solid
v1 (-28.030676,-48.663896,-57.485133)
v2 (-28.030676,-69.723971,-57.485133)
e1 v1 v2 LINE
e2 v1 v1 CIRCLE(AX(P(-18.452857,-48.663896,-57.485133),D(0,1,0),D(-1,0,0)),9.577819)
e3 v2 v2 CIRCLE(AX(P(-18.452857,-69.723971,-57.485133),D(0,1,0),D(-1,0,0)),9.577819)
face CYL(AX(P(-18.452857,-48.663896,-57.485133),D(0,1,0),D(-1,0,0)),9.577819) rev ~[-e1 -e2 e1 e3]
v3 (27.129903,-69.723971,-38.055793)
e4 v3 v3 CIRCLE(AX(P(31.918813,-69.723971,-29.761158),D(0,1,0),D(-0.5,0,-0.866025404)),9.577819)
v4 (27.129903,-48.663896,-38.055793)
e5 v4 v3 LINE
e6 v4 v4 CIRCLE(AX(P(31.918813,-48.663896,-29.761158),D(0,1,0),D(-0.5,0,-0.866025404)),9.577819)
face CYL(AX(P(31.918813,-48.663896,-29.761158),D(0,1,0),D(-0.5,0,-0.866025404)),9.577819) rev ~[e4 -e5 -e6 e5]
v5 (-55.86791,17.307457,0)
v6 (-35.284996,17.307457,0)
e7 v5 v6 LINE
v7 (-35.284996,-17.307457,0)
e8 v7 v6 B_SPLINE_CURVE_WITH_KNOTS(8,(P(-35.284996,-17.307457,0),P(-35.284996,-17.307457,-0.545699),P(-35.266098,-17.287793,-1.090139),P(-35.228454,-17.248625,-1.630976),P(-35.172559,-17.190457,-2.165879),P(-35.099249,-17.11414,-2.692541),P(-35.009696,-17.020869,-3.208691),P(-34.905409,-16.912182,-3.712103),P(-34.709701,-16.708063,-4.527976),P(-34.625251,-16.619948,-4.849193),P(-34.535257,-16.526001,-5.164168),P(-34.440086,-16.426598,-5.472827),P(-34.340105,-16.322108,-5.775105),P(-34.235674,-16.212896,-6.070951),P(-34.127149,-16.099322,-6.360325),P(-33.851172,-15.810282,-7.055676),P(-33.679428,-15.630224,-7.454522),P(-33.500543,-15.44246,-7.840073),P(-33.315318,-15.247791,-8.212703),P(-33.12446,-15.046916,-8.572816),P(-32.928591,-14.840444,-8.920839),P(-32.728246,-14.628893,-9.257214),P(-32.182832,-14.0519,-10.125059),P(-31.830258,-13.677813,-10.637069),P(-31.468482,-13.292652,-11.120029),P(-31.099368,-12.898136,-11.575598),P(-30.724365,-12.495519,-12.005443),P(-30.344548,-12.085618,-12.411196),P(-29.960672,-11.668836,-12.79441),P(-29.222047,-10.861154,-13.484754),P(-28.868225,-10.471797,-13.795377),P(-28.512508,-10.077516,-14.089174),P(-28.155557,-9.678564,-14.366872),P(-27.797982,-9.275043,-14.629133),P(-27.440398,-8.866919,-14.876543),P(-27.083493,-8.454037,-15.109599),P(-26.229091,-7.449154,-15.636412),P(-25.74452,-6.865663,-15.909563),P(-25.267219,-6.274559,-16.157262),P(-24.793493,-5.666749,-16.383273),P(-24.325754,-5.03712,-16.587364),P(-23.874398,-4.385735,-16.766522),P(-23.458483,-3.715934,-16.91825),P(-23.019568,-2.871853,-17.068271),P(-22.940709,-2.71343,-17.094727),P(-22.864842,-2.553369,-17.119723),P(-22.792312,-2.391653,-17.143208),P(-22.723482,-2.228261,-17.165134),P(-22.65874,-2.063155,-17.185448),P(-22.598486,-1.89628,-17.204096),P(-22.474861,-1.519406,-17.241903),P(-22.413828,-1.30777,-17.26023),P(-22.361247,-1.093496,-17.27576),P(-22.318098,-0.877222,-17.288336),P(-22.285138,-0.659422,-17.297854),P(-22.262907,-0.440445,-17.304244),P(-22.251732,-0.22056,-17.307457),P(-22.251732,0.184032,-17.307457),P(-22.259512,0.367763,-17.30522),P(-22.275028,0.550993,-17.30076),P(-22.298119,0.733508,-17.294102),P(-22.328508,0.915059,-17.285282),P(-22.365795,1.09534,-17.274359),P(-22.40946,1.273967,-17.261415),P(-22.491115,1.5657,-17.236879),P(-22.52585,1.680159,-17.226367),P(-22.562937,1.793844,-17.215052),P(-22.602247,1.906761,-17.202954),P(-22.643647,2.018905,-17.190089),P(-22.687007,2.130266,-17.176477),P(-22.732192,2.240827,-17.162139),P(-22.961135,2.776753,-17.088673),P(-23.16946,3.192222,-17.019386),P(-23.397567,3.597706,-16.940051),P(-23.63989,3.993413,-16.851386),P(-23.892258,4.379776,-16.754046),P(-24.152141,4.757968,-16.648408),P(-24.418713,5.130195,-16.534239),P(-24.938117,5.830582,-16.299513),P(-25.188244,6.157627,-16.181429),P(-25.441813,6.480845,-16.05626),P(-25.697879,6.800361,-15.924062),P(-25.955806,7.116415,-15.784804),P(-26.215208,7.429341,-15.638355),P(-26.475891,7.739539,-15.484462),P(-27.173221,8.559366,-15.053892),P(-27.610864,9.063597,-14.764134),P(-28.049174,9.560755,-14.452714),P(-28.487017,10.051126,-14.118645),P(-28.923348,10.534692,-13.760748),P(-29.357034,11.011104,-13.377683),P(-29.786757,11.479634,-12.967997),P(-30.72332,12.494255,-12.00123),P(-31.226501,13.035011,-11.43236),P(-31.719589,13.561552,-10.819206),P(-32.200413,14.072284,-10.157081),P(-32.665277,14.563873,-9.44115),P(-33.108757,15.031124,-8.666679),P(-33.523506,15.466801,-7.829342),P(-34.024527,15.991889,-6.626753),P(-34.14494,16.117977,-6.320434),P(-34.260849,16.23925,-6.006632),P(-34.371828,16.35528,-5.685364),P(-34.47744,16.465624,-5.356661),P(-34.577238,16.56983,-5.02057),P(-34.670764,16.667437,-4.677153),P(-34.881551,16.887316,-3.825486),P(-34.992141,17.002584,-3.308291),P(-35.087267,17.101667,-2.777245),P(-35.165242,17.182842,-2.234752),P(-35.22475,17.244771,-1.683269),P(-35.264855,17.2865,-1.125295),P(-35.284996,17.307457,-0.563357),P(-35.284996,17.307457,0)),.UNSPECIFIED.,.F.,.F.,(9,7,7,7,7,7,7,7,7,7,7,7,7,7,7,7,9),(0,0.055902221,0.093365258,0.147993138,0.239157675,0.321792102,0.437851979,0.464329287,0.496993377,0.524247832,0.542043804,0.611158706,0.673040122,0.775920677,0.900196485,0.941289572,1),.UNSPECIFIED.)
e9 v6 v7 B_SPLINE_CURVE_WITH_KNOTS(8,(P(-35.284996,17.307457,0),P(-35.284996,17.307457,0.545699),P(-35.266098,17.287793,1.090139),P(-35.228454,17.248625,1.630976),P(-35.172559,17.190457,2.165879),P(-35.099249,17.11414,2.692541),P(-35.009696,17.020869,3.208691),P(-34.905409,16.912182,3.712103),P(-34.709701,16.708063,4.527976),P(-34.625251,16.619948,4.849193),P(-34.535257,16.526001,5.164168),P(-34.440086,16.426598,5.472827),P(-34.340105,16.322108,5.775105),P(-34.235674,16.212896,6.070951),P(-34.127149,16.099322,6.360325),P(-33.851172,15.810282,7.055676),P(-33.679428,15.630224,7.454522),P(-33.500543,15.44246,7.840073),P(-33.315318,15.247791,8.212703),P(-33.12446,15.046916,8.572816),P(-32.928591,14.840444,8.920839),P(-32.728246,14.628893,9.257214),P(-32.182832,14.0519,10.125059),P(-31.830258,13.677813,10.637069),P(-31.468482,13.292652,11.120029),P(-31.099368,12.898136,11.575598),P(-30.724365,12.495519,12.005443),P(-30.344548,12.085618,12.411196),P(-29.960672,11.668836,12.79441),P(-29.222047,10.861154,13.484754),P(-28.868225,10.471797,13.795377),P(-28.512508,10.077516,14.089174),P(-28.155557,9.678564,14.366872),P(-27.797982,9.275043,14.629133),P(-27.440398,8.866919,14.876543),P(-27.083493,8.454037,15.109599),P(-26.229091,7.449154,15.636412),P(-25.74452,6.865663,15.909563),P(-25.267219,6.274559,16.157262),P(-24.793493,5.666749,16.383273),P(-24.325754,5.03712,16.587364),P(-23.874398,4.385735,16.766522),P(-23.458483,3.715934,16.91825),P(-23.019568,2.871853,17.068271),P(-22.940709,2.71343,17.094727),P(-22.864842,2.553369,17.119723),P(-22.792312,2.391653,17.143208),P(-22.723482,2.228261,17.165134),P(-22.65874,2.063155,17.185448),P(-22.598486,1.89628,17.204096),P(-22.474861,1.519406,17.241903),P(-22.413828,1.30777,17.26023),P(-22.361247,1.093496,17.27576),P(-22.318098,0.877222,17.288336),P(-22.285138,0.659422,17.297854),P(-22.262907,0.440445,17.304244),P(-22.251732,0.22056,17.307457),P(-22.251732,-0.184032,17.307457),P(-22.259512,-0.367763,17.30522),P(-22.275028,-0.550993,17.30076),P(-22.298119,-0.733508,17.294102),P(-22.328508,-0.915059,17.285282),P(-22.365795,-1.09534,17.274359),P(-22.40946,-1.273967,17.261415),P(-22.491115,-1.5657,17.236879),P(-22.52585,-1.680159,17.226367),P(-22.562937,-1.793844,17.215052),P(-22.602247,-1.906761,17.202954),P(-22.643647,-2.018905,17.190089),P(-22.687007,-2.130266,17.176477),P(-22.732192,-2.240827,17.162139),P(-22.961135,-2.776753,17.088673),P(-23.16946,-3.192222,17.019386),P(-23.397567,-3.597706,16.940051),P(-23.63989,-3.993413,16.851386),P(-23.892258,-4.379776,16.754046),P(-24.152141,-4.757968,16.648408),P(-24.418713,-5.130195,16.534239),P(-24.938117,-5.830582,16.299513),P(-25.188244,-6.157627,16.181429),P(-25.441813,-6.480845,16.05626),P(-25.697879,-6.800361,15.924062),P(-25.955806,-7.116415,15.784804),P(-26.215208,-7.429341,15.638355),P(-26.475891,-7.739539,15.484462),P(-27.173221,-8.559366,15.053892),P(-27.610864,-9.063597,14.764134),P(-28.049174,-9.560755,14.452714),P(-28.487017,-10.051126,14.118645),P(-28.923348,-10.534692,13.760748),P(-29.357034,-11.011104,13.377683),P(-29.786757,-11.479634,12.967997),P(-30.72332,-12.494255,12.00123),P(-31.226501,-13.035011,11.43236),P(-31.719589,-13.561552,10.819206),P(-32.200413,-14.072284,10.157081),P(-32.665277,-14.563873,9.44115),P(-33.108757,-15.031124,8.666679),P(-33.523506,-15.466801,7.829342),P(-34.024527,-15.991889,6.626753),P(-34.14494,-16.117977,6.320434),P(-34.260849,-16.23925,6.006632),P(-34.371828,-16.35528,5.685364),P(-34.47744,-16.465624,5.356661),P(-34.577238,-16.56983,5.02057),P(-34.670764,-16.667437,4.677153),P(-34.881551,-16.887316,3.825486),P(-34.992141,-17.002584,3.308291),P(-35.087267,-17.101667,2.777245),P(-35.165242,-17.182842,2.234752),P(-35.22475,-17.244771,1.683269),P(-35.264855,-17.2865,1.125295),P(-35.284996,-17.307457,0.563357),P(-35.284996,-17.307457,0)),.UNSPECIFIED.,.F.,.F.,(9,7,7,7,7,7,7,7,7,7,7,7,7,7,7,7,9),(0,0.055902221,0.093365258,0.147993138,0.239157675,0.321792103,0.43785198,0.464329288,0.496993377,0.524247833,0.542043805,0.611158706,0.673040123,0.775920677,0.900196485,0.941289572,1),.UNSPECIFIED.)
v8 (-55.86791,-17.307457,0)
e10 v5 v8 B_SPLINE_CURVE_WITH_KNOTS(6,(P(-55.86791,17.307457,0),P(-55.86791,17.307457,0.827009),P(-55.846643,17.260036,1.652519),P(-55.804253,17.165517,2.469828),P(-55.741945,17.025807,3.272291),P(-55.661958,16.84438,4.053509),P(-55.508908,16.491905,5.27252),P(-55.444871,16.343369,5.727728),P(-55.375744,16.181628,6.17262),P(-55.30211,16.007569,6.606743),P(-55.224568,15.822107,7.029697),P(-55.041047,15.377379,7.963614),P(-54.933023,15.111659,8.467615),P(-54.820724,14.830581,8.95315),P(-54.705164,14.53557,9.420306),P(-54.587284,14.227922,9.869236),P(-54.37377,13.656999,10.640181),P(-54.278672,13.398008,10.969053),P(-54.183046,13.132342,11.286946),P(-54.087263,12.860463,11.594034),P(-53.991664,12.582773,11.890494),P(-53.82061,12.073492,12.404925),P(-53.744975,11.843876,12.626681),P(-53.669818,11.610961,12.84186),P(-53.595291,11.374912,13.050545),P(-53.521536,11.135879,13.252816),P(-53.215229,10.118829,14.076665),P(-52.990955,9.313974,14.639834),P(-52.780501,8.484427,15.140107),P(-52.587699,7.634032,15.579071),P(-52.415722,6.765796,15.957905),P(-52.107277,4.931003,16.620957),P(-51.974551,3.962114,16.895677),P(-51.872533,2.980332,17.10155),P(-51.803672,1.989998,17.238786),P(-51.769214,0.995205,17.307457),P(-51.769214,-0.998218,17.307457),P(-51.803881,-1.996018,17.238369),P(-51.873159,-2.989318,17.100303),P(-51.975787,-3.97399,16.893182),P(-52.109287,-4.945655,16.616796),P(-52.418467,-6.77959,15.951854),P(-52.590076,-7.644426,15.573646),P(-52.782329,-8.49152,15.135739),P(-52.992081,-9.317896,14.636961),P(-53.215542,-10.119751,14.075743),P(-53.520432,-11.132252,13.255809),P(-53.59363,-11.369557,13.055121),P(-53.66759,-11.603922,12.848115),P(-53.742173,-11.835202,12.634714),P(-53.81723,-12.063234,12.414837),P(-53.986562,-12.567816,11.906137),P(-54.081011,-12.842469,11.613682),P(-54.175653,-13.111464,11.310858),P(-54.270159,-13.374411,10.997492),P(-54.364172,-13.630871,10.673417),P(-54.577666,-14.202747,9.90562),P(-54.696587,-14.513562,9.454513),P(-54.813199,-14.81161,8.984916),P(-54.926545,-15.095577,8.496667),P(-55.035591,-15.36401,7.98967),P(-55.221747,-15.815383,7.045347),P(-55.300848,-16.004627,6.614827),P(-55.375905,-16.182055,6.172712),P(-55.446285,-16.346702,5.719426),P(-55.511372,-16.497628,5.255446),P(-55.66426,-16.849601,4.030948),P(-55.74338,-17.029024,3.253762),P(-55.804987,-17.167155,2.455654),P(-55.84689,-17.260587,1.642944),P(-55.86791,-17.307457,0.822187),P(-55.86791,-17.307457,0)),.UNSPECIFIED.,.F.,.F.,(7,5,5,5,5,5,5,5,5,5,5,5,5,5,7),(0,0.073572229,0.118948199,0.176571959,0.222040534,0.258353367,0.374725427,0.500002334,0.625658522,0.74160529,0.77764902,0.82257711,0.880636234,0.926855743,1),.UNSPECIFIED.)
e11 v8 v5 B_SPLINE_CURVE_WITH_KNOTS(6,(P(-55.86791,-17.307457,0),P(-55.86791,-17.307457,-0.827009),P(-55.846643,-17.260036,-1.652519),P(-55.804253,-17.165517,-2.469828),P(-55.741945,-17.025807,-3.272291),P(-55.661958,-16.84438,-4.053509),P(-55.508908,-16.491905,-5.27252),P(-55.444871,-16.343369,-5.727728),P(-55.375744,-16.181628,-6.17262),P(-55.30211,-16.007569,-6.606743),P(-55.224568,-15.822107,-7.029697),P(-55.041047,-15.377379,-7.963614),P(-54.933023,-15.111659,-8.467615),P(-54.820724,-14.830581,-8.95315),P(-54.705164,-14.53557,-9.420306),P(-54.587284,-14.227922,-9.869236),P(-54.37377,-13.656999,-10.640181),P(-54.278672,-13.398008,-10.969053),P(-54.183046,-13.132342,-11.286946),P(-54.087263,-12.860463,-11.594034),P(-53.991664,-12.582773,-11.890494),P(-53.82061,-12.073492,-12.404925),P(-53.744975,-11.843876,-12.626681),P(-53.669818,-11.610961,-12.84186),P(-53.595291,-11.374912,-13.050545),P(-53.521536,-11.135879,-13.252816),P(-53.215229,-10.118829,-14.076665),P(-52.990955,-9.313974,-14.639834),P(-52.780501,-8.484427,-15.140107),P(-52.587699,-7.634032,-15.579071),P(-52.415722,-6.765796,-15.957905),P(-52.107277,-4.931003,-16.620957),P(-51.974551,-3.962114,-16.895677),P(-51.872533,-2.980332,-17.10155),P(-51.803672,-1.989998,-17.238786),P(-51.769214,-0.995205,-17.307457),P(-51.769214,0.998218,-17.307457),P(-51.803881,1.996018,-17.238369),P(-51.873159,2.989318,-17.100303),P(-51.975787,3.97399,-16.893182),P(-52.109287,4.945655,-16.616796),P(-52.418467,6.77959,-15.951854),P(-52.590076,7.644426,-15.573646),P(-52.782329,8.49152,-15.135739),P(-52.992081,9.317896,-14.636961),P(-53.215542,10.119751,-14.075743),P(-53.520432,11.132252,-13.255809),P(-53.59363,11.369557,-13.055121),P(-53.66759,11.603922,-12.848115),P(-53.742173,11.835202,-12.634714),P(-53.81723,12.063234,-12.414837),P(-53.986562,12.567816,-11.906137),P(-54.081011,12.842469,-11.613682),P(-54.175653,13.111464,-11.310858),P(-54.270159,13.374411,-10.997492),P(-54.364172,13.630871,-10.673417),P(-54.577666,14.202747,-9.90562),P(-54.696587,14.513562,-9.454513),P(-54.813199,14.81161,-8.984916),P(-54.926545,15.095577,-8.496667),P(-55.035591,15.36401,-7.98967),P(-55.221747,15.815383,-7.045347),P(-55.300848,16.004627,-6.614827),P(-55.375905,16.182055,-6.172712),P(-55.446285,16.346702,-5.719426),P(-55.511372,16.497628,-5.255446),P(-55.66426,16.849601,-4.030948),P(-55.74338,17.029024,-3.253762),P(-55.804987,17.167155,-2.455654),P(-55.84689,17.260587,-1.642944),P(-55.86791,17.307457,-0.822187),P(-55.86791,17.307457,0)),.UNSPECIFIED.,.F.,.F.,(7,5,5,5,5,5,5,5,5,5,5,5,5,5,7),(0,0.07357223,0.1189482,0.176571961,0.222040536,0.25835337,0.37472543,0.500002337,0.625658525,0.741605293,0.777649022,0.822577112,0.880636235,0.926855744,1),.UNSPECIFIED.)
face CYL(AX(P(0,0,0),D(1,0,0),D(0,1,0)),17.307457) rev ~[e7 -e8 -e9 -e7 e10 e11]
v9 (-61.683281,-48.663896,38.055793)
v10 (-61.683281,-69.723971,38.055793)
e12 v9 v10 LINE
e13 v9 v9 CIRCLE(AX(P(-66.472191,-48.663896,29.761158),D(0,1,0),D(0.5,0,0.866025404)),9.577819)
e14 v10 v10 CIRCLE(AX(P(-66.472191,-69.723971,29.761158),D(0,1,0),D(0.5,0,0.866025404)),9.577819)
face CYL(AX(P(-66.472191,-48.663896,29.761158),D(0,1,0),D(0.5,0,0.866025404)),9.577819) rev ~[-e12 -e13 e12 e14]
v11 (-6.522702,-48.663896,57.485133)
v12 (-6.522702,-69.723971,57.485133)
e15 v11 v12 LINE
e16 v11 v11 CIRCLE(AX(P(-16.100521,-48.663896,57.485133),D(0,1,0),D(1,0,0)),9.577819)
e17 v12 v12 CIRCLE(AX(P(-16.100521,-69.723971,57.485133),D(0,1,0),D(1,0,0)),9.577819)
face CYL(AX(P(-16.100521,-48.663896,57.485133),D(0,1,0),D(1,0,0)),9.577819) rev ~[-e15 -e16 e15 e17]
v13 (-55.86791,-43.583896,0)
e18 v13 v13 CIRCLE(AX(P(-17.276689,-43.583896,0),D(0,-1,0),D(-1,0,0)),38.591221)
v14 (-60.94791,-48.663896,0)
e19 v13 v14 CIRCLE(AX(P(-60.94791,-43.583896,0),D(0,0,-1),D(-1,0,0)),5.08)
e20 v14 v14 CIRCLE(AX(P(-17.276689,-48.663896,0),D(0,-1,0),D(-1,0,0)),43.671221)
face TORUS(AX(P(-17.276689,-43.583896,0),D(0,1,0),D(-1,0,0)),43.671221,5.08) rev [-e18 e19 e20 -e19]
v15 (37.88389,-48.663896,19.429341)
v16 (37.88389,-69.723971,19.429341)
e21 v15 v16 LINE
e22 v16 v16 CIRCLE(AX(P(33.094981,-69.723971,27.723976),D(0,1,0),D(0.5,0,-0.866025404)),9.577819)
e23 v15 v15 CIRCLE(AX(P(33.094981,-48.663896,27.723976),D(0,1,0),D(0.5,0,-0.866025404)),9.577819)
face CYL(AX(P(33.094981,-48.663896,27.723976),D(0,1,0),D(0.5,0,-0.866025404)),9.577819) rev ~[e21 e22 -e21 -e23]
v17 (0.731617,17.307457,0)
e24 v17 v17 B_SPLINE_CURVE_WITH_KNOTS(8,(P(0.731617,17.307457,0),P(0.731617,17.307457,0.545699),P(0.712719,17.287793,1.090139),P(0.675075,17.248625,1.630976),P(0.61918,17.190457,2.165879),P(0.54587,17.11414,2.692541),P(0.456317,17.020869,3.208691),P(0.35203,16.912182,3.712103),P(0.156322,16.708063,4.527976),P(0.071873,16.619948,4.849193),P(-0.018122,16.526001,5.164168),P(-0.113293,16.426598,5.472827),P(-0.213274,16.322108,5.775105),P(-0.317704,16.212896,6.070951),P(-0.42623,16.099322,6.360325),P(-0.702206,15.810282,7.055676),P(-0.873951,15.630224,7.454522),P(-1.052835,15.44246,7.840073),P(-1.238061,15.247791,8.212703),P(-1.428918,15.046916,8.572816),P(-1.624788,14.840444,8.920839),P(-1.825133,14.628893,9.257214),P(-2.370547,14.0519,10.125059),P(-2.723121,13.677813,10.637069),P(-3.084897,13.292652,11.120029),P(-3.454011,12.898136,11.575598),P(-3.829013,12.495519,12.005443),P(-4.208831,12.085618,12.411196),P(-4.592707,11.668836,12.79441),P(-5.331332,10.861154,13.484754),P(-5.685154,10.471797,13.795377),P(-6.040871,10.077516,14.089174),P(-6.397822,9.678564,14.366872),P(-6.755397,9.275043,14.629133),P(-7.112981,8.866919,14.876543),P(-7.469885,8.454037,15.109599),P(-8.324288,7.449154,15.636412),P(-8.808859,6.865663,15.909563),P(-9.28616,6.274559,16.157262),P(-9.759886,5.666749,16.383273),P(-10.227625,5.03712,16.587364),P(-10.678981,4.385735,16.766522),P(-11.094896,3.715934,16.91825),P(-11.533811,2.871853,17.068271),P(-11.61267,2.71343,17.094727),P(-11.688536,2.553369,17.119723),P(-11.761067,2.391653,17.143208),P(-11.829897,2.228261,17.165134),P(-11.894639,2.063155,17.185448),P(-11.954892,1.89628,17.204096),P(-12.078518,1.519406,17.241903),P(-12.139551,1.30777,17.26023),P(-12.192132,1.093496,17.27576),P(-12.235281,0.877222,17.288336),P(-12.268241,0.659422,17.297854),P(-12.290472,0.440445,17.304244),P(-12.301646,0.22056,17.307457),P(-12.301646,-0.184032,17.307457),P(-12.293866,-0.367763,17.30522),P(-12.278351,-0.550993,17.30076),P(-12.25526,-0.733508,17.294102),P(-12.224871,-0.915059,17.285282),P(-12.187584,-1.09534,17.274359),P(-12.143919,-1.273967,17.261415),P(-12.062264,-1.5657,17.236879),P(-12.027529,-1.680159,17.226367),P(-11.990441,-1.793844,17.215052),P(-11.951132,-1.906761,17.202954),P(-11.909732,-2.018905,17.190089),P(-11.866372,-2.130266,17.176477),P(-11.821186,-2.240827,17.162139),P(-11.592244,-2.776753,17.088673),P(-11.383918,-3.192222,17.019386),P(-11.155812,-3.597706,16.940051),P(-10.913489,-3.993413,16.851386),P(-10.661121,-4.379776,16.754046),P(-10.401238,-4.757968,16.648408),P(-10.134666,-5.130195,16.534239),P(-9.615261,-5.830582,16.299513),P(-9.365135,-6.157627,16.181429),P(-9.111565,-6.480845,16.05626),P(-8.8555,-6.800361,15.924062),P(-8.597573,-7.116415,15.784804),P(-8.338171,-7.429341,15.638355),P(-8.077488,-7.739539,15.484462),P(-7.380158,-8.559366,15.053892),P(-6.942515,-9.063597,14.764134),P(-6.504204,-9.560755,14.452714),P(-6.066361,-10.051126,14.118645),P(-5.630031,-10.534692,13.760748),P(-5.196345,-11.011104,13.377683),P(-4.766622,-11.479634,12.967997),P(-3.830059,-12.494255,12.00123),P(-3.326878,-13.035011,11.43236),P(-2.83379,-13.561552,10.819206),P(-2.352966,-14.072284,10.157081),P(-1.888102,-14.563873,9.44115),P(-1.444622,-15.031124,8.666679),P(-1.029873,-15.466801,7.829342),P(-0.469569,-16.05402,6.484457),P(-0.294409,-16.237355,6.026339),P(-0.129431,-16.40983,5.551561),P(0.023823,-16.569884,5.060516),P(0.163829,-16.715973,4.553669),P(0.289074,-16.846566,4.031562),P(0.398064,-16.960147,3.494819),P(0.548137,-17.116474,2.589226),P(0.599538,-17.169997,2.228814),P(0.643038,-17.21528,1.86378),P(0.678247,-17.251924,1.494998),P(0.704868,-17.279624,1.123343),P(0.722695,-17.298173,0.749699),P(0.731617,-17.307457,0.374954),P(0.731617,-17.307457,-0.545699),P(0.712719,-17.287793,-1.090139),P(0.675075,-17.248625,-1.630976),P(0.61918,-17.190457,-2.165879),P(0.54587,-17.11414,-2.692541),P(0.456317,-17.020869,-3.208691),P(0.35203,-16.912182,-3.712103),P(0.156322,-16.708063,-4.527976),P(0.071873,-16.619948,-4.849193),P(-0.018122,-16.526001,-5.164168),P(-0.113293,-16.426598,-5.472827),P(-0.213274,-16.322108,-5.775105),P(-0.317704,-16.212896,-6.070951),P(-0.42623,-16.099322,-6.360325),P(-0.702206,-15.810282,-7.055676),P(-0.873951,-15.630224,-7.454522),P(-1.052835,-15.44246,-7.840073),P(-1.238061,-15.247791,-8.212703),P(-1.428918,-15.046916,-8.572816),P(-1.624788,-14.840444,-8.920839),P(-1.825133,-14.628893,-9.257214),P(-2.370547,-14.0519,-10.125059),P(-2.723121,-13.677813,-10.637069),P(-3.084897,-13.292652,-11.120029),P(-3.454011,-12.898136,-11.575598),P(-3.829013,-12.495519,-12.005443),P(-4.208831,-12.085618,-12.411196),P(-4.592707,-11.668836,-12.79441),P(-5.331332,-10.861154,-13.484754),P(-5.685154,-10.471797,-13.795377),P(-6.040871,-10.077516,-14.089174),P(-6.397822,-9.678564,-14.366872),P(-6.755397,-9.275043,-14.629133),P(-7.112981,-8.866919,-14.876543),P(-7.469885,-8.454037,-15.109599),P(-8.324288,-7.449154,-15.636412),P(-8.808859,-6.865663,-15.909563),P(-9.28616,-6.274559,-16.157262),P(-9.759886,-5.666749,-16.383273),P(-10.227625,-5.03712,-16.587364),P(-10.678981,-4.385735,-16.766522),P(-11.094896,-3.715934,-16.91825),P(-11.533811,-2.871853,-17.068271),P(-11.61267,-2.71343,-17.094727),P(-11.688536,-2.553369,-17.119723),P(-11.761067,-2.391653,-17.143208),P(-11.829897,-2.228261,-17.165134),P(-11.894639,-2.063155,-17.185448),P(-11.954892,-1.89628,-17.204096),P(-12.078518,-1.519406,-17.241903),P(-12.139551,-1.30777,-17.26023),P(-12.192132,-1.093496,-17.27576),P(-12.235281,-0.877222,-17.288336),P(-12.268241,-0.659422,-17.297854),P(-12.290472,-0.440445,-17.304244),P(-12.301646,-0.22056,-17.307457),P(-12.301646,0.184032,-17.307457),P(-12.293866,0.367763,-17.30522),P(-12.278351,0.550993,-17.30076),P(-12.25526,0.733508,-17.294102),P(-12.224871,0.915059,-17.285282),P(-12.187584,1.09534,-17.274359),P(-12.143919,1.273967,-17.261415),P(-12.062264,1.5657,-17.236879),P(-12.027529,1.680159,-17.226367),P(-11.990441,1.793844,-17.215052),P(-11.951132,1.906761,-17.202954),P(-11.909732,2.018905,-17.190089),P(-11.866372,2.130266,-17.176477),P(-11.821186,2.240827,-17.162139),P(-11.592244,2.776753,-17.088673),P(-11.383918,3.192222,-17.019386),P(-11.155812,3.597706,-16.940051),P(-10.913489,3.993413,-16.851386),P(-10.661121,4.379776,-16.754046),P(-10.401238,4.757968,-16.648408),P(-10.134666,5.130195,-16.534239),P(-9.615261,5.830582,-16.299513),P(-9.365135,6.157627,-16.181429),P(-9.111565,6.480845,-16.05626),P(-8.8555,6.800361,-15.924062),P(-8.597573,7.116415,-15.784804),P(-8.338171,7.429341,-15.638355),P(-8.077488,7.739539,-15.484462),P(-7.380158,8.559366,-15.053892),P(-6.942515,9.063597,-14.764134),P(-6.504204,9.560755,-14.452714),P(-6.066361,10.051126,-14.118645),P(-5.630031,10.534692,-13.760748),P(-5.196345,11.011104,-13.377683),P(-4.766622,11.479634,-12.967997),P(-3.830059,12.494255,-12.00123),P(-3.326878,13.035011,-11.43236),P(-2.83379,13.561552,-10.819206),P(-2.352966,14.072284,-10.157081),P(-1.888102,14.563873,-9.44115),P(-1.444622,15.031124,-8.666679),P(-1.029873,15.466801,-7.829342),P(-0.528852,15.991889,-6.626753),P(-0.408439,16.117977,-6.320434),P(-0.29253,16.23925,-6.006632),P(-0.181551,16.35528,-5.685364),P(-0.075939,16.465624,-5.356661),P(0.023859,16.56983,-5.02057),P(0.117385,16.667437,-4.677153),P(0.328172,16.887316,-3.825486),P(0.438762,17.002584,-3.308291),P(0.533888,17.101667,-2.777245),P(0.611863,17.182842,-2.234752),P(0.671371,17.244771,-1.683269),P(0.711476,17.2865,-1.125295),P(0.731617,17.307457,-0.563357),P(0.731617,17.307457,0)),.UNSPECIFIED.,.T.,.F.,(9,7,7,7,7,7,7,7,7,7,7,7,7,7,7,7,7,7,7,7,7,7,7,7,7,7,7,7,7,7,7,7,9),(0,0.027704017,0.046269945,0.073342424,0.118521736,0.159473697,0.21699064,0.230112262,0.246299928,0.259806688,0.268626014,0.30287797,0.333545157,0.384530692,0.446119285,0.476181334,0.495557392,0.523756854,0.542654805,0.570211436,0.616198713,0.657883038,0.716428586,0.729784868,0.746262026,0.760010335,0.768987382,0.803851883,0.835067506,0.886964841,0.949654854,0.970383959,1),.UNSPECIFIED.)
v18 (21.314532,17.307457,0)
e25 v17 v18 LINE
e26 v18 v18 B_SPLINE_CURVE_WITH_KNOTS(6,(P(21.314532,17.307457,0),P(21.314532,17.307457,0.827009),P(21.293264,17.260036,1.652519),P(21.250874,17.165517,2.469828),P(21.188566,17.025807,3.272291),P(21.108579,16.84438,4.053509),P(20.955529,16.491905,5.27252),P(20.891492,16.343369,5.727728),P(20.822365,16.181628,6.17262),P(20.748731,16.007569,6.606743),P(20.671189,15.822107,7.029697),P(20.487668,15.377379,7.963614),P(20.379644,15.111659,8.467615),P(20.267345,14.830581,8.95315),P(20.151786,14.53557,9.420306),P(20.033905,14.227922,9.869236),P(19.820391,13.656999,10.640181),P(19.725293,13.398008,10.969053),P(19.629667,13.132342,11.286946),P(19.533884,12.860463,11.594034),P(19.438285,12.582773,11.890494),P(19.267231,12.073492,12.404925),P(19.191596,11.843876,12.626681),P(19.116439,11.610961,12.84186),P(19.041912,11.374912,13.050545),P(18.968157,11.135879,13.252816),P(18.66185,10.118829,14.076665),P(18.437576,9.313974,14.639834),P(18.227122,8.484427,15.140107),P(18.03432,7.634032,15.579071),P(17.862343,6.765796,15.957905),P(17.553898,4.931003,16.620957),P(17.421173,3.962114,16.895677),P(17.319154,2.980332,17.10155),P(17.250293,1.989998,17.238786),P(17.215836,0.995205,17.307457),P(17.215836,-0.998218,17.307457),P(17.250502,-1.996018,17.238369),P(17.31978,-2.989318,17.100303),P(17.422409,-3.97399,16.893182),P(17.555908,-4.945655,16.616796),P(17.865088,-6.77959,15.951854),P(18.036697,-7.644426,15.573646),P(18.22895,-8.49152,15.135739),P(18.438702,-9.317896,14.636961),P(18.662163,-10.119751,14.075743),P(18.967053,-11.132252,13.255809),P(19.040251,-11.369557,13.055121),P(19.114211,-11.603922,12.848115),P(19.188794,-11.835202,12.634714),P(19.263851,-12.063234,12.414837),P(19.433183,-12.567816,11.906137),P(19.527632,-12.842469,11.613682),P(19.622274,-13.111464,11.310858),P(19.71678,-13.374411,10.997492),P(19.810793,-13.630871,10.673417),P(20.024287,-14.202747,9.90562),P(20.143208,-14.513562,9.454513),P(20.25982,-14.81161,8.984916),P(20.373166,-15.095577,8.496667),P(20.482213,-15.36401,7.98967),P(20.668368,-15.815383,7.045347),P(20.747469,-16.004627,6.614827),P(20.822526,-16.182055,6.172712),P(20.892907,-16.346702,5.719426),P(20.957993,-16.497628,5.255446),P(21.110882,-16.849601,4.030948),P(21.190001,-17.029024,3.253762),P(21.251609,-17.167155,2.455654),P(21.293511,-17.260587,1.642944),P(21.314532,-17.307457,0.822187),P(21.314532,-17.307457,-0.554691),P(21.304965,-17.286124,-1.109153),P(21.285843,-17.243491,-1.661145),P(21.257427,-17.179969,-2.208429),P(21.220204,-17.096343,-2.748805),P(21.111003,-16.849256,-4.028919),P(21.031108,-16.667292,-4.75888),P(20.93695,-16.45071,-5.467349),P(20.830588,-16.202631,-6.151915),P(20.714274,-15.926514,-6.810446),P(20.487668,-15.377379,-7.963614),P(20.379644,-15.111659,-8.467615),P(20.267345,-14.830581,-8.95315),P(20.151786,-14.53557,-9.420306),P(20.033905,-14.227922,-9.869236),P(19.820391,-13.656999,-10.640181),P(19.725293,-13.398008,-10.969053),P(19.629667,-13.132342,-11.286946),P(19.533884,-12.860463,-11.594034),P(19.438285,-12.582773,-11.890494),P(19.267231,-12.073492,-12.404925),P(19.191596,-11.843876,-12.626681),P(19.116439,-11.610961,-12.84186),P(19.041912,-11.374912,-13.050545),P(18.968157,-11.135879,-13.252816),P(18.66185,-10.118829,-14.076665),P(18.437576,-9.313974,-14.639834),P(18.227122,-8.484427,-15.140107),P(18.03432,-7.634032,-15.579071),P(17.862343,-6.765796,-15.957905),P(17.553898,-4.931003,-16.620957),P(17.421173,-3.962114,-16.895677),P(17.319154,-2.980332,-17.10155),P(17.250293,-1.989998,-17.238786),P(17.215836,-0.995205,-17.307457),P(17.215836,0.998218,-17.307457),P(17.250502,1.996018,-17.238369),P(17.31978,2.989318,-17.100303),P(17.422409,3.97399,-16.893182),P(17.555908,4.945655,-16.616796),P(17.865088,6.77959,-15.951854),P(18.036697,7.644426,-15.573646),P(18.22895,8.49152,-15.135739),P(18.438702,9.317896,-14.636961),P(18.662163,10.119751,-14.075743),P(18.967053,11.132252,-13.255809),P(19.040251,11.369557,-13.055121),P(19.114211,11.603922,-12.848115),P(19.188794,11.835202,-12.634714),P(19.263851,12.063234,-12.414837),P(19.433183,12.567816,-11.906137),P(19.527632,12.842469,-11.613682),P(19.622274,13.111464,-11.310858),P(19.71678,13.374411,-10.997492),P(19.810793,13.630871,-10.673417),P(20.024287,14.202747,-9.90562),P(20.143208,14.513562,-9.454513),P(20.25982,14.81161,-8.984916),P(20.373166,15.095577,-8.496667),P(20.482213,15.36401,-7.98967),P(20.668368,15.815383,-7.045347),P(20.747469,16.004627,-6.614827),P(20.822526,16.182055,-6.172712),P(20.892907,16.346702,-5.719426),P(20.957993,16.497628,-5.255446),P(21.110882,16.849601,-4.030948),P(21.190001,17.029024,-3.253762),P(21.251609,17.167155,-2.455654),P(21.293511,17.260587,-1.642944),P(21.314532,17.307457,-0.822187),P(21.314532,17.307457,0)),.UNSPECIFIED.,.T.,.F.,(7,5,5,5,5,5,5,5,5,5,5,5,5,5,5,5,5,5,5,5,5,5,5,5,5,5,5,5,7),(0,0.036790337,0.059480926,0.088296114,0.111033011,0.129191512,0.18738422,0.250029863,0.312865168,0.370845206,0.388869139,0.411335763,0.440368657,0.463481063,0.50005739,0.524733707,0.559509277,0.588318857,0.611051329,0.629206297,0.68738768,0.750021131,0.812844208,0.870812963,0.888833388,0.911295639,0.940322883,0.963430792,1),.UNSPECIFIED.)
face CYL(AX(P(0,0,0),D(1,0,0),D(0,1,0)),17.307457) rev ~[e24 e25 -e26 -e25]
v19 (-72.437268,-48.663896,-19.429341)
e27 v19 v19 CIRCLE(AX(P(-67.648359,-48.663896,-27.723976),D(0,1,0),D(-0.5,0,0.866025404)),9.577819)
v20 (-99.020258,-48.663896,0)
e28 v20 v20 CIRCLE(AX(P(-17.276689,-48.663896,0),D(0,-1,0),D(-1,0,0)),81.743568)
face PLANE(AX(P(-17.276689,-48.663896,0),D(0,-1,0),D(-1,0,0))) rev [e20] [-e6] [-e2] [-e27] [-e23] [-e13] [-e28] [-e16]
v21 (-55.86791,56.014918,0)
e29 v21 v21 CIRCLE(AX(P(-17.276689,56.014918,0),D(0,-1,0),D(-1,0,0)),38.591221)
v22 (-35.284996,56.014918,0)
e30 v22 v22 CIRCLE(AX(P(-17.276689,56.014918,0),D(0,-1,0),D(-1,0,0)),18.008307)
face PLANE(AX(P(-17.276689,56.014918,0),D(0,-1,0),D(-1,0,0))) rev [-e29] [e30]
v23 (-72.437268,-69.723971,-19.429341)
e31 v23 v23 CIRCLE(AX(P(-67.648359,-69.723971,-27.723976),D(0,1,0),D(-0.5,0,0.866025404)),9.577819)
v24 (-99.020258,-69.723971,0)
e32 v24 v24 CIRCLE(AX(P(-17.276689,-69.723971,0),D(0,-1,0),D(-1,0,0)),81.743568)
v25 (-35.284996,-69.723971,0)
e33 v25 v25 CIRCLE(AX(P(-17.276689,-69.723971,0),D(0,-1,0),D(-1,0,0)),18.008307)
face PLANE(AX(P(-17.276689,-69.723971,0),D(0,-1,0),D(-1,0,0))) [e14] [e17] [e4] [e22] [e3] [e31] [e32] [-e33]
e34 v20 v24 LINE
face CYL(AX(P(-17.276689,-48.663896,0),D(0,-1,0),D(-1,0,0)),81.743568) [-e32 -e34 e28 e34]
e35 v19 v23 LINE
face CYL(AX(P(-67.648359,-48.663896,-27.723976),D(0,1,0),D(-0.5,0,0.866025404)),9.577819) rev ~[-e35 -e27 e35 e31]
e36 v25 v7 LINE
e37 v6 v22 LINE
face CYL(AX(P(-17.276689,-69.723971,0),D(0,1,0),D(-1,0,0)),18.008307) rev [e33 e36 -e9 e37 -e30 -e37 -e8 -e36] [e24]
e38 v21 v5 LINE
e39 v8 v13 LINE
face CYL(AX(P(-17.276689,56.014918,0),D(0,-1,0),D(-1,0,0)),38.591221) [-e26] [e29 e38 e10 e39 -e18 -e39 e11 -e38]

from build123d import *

# Parameters (mm, degrees)
F2_R            = 9.5778194828
F3_DEPTH        = 25.4
F3_COPIES_COUNT = 6
F4_R            = 5.08
F5_R            = 17.307456635
F6_DEPTH        = 70.104


# Not quite as in the source:
# - a pattern or mirror of a feature is missing from the dataset's text; its kind, count and spacing are read off the source's solid


with BuildPart() as f1:
    # F0 (on Top) → F1 (revolve)
    with BuildSketch(Plane.XY):
        Polygon((-35.2849960327, 56.0149177909), (-55.8679103851, 56.0149177909), (-55.8679103851, -48.6638955772), (-99.0202575922, -48.6638955772), (-99.0202575922, -69.7239711881), (-35.2849960327, -69.7239711881), (-35.2849960327, -48.6638955772), align=None)
    revolve(axis=Axis((-17.2766894102, -6.7990683019, 0), (0, -1, 0)))

    # F2 (on face) → F3 (cut)
    with BuildSketch(Plane(origin=(0, -48.6638955772, 0), x_dir=(-1, 0, 0), z_dir=(0, 1, 0))):
        with Locations((18.4528566897, -57.4851334095)):
            Circle(F2_R)
    f3 = extrude(amount=-F3_DEPTH, mode=Mode.SUBTRACT)

    # F3_copies: F3 ×6 about axis
    f3_copies_axis = Axis((-17.276689, 0, 0), (0, 1, 0))
    for i in range(1, F3_COPIES_COUNT):
        add(f3.rotate(f3_copies_axis, i * 360 / F3_COPIES_COUNT), mode=Mode.SUBTRACT)

    # F4
    f4_edges = [f1.edges().sort_by_distance(p)[0] for p in [
        (21.314532, -48.663896, 0),
    ]]
    fillet(f4_edges, radius=F4_R)

    # F5 (on Right) → F6 (cut, symmetric)
    with BuildSketch(Plane.YZ):
        Circle(F5_R)
    extrude(amount=F6_DEPTH, both=True, mode=Mode.SUBTRACT)


solid = f1.part
